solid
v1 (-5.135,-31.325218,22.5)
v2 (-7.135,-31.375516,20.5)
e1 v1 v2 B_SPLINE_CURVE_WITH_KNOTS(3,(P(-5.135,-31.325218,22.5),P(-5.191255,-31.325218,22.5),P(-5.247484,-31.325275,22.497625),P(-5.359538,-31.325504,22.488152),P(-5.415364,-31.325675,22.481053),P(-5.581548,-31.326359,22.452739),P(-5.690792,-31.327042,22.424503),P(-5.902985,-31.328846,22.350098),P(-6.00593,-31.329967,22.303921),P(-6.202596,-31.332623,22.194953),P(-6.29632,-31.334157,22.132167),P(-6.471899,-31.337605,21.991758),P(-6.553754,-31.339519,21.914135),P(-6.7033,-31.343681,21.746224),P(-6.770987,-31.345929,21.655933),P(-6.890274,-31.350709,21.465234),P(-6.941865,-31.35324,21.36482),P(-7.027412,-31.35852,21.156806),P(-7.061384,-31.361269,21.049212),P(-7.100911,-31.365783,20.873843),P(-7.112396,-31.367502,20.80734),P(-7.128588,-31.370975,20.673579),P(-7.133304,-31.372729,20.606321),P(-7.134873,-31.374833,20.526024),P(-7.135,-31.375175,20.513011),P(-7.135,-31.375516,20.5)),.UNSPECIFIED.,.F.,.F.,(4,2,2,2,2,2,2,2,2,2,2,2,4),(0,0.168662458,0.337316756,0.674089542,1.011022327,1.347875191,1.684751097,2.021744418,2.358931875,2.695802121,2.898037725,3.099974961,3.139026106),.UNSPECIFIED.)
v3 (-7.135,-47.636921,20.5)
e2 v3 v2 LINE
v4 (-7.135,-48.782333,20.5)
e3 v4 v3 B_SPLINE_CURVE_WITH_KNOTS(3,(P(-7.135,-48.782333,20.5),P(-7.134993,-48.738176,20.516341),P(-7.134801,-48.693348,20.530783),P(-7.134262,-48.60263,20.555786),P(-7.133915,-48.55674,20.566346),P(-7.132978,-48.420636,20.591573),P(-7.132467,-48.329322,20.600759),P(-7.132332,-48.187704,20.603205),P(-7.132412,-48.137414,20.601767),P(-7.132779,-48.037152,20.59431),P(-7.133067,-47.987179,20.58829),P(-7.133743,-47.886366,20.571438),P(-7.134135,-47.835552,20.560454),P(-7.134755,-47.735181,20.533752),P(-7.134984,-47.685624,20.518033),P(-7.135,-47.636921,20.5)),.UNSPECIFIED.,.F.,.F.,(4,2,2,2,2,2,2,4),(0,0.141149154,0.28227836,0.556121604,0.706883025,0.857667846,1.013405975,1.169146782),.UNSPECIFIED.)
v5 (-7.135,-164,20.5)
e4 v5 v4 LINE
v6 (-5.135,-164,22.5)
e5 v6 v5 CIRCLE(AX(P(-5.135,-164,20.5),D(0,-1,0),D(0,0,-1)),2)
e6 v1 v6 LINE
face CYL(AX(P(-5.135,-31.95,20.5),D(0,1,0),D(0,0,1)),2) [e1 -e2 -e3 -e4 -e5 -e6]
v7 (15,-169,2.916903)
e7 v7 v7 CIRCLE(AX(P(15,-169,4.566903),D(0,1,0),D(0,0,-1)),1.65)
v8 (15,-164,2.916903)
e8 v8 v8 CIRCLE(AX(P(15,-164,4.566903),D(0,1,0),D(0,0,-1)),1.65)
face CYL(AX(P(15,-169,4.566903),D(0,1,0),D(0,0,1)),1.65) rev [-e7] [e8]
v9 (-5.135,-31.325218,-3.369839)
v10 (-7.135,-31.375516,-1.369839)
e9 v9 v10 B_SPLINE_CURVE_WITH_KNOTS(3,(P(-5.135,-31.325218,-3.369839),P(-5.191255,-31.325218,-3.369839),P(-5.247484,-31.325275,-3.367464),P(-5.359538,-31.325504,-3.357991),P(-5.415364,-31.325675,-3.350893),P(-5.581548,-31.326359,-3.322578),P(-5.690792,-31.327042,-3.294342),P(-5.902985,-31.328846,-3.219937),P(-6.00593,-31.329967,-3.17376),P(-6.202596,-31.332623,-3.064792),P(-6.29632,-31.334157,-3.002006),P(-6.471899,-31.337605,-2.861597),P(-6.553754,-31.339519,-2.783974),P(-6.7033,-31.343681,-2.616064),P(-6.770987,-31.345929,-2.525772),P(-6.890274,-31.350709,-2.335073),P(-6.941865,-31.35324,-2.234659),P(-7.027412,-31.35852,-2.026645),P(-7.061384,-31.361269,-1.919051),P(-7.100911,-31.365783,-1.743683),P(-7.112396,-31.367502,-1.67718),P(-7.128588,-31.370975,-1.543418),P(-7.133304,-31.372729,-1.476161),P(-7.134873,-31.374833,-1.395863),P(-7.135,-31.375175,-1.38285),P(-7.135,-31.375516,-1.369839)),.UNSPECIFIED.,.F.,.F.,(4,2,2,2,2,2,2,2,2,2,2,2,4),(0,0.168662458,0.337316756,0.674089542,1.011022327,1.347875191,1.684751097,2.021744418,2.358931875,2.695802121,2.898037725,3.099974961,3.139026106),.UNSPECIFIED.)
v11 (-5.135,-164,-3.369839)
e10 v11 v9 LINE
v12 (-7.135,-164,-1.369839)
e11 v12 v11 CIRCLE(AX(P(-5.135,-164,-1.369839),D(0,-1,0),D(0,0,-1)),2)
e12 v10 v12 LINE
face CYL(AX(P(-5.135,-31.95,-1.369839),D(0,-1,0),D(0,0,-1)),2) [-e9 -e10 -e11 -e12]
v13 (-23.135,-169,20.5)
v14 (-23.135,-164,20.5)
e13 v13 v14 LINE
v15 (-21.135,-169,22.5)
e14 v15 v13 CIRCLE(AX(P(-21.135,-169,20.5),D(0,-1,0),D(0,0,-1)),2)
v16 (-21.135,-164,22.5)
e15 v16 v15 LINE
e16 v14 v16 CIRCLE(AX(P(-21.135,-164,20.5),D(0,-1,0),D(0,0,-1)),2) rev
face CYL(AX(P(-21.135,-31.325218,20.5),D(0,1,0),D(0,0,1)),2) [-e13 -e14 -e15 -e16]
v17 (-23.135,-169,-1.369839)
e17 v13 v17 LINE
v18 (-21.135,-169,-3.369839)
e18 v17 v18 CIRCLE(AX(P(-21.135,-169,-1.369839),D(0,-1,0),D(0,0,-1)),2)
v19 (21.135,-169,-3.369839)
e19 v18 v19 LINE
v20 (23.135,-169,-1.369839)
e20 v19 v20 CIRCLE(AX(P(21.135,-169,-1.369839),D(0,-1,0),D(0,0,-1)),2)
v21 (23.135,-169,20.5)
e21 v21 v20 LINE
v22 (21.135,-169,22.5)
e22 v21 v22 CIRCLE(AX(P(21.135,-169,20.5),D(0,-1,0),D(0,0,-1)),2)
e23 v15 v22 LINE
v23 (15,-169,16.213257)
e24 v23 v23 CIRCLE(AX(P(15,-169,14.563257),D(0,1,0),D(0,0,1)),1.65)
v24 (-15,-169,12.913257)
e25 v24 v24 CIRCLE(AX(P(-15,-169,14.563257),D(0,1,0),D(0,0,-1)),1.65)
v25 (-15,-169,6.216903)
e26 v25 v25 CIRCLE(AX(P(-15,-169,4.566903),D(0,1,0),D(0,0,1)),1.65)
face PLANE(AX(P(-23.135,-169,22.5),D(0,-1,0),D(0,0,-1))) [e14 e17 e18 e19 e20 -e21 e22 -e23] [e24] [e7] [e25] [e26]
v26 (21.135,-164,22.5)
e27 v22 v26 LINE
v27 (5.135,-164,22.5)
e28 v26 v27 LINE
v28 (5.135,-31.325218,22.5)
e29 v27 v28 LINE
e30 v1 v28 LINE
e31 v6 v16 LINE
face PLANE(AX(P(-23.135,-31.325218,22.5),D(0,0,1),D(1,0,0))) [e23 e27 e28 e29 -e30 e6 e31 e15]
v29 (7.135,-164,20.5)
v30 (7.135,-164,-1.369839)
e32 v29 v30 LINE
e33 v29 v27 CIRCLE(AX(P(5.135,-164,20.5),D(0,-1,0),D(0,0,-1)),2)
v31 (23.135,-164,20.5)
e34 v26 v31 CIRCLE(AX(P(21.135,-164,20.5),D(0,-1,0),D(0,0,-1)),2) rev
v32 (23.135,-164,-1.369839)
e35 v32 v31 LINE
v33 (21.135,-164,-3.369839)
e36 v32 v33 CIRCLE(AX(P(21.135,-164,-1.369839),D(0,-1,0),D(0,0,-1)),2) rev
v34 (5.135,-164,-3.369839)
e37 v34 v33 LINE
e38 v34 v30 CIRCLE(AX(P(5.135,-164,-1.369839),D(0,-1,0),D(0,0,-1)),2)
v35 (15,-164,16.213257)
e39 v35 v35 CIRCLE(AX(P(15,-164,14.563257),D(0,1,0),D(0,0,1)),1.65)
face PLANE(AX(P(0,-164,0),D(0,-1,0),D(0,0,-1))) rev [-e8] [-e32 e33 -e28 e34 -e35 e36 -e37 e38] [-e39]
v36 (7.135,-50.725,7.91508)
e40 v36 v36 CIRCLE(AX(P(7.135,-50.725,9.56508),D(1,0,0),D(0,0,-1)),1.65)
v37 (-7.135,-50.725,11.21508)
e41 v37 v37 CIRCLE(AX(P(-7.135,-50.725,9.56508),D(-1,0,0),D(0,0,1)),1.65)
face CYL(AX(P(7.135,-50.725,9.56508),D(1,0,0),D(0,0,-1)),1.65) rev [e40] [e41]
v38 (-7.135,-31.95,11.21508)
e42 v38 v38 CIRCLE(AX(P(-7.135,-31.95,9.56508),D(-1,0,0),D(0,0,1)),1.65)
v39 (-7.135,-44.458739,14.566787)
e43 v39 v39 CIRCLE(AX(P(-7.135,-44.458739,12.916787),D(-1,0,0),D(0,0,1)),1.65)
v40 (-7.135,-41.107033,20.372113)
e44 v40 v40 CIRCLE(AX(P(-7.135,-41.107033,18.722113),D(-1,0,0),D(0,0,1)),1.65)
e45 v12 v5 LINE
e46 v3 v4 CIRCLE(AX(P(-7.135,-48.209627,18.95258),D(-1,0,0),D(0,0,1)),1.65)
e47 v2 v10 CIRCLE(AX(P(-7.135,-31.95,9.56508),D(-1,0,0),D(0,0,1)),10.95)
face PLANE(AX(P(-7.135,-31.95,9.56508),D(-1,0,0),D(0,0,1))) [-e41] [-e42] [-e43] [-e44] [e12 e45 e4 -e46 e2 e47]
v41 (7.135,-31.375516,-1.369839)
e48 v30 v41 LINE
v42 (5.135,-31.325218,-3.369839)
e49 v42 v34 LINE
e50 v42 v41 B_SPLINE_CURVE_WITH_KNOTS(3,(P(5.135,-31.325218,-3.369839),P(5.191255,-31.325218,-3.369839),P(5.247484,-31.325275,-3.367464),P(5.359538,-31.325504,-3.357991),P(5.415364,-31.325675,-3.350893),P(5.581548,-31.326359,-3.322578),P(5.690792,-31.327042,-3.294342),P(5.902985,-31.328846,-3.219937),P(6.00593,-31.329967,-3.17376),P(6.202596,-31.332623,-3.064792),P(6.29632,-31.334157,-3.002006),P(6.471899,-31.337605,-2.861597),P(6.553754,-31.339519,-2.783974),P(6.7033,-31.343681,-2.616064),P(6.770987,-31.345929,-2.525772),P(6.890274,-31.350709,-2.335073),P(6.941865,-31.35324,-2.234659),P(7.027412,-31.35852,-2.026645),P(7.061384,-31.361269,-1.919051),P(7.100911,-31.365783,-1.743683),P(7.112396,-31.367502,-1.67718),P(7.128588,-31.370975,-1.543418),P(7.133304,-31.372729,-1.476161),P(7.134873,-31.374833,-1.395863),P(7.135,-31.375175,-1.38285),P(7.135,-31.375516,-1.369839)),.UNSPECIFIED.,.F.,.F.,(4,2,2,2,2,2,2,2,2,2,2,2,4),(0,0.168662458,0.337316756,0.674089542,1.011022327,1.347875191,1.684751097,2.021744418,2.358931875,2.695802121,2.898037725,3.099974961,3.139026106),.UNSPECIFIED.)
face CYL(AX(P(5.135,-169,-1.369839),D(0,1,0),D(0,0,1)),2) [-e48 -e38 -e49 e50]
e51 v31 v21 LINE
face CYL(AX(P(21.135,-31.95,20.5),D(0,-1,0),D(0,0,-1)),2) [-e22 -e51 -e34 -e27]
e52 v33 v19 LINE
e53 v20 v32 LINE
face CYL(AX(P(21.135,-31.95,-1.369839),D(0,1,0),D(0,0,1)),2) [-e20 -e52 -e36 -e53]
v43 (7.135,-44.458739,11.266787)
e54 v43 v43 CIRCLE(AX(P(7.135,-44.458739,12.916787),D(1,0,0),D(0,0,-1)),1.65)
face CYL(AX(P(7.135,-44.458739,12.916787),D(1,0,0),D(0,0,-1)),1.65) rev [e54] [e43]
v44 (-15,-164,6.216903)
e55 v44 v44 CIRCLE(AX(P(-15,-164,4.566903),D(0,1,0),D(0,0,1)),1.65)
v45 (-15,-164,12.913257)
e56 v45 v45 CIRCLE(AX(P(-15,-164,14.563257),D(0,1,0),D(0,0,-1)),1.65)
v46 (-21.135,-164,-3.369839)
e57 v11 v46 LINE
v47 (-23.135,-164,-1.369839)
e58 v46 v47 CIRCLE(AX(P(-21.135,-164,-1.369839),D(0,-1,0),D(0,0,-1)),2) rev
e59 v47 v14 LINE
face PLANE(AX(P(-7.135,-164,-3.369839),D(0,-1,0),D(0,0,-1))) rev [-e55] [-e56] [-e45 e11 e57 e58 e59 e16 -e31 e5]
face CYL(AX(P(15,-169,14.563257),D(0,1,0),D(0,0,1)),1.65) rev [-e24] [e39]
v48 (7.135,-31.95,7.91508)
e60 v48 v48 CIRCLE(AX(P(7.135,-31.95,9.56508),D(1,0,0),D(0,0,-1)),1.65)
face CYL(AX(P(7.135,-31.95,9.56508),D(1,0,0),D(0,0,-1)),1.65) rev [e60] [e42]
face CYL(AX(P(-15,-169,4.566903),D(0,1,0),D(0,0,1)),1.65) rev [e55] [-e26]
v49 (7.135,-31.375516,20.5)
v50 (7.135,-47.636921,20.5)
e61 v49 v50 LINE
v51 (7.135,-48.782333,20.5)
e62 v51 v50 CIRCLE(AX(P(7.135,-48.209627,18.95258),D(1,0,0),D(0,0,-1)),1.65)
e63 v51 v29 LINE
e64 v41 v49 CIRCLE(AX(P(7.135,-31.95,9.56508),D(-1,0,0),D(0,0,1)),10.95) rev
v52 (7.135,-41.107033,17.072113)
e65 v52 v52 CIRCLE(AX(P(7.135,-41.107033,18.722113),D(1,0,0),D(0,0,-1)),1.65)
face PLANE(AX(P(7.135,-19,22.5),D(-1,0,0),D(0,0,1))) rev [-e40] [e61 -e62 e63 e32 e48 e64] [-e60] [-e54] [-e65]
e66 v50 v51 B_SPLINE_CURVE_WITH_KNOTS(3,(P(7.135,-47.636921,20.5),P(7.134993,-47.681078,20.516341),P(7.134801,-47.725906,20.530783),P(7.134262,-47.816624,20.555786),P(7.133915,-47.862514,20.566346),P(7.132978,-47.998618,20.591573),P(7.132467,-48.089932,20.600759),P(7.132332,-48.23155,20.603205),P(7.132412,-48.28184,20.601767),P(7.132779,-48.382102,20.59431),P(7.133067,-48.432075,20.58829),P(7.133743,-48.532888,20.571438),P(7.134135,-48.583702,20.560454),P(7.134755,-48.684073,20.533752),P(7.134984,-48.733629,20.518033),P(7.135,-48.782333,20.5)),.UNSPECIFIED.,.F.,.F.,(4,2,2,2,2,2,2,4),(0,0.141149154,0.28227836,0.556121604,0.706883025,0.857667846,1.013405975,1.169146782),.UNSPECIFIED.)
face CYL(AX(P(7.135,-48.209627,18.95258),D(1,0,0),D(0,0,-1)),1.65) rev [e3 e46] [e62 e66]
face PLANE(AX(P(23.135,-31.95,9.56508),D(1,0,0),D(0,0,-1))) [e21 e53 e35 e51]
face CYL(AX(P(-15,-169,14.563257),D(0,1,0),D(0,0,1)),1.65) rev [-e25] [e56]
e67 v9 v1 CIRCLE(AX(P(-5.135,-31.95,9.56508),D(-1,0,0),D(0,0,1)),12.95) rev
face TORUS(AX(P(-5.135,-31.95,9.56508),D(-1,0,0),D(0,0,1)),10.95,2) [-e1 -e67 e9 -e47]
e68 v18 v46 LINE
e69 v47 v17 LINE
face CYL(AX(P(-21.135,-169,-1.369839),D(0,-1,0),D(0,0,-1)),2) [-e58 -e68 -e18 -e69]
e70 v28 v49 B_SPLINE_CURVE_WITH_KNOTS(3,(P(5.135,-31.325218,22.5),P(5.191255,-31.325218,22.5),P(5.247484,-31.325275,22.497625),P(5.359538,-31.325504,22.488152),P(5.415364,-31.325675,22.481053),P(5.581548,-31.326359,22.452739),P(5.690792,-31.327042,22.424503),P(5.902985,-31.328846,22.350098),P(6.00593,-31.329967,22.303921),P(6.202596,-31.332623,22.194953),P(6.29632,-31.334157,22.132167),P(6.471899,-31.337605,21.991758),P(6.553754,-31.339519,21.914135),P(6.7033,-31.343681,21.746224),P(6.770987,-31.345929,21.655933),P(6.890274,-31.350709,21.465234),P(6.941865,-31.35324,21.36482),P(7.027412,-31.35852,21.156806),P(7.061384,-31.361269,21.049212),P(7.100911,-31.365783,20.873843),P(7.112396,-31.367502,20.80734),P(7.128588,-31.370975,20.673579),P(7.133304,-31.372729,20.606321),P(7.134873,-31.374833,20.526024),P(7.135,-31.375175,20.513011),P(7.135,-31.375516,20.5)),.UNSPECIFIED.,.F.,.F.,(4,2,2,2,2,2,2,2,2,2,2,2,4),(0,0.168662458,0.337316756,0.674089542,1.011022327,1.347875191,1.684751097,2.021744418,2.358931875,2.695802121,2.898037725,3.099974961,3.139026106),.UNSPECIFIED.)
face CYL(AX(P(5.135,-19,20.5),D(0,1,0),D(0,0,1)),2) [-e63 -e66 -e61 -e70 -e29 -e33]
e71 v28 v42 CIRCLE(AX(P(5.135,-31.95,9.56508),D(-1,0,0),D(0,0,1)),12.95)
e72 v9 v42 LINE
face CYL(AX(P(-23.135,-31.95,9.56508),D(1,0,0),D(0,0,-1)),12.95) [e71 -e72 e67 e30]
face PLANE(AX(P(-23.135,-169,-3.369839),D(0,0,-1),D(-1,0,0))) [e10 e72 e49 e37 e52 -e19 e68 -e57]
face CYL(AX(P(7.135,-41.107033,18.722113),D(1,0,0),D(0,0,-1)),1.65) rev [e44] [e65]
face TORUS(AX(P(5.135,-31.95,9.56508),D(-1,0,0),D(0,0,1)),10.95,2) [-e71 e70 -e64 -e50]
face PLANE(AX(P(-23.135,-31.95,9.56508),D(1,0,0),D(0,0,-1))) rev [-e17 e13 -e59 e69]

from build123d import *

# Parameters (mm, degrees)
BOSS_EXTRUDE1_DEPTH            = 46.27
CUT_EXTRUDE1_START             = -16
CUT_EXTRUDE1_DEPTH             = 16
SKETCH3_W                      = 16
SKETCH3_H                      = 25.869839341
CUT_EXTRUDE2_DEPTH             = 149.547898757
F_3_3_3_3_DIAMETER_HOLE2_D     = 3.3
F_3_3_3_3_DIAMETER_HOLE2_DEPTH = 30.27
FILLET1_START                  = -31.325217542
FILLET1_OUTLINE_W              = 14.27
FILLET1_OUTLINE_H              = 25.869839341
FILLET1_DEPTH                  = 12.325217542
FILLET1_START_2                = -164
FILLET1_2_DEPTH                = 136.422667769
FILLET1_START_3                = -170
FILLET1_3_DEPTH                = 133.08200918
FILLET1_4_ANGLE                = 174.469297
SKETCH9_R                      = 1.65
CUT_EXTRUDE4_DEPTH             = 149.547898869


with BuildPart() as part:
    # Sketch1 → Boss-Extrude1 (new body)
    with BuildSketch(Plane(origin=(23.135, 0, 0), x_dir=(0, 0, -1), z_dir=(1, 0, 0))):
        with BuildLine():
            Line((3.369839341, -169), (3.369839341, -31.325217542))
            ThreePointArc((3.369839341, -31.325217542), (-9.56508033, -19), (-22.5, -31.325217542))
            Line((-22.5, -31.325217542), (-22.5, -169))
            Line((-22.5, -169), (3.369839341, -169))
        make_face()
    extrude(amount=-BOSS_EXTRUDE1_DEPTH)

    # Sketch2 → Cut-Extrude1 (cut)
    with BuildSketch(Plane.ZY.offset(23.135).offset(CUT_EXTRUDE1_START)):
        with BuildLine():
            Line((-3.369839341, -31.325217542), (-3.369839341, -164))
            Line((-3.369839341, -164), (22.5, -164))
            Line((22.5, -164), (22.5, -31.325217542))
            ThreePointArc((22.5, -31.325217542), (9.56508033, -19), (-3.369839341, -31.325217542))
        make_face()
    extrude(amount=CUT_EXTRUDE1_DEPTH, mode=Mode.SUBTRACT)

    # Sketch3 → Cut-Extrude2 (cut, through all)
    with BuildSketch(Plane.XZ.offset(164)):
        with Locations((15.135, 9.56508033)):
            Rectangle(SKETCH3_W, SKETCH3_H)
    extrude(amount=-CUT_EXTRUDE2_DEPTH, mode=Mode.SUBTRACT)

    # Ø3.3 (3.3) Diameter Hole2
    with Locations(Plane(origin=(7.135, 0, 0), x_dir=(0, 0, -1), z_dir=(1, 0, 0))):
        with Locations((-9.56508033, -31.95), (-12.916786964, -44.45873945), (-9.56508033, -50.725), (-18.95258033, -48.209626956), (-18.722113146, -41.107032816)):
            Hole(F_3_3_3_3_DIAMETER_HOLE2_D / 2, depth=F_3_3_3_3_DIAMETER_HOLE2_DEPTH)

    # Fillet1: read off the stored shape, not the designer's step
    # Fillet1 outline → Fillet1 (cut)
    with BuildSketch(Plane(origin=(0, 0, 0), x_dir=(1, 0, 0), z_dir=(0, 1, 0)).offset(FILLET1_START)):
        with Locations((0, -9.56508033)):
            Rectangle(FILLET1_OUTLINE_W, FILLET1_OUTLINE_H)
    extrude(amount=FILLET1_DEPTH, mode=Mode.SUBTRACT)

    # Fillet1 2 outline → Fillet1 2 (cut)
    with BuildSketch(Plane(origin=(0, 0, 0), x_dir=(1, 0, 0), z_dir=(0, 1, 0)).offset(FILLET1_START_2)):
        with BuildLine():
            Line((7.135, 1.369839341), (7.135, 3.369839341))
            Line((7.135, 3.369839341), (5.135, 3.369839341))
            ThreePointArc((5.135, 3.369839341), (6.549213562, 2.784052903), (7.135, 1.369839341))
        make_face()
        with BuildLine():
            Line((5.135, -22.5), (7.135, -22.5))
            Line((7.135, -22.5), (7.135, -20.5))
            ThreePointArc((7.135, -20.5), (6.549213562, -21.914213562), (5.135, -22.5))
        make_face()
        with BuildLine():
            ThreePointArc((-7.135, 1.369839341), (-6.549213562, 2.784052903), (-5.135, 3.369839341))
            Line((-5.135, 3.369839341), (-7.135, 3.369839341))
            Line((-7.135, 3.369839341), (-7.135, 1.369839341))
        make_face()
        with BuildLine():
            Line((-7.135, -22.5), (-5.135, -22.5))
            ThreePointArc((-5.135, -22.5), (-6.549213562, -21.914213562), (-7.135, -20.5))
            Line((-7.135, -20.5), (-7.135, -22.5))
        make_face()
    extrude(amount=FILLET1_2_DEPTH, mode=Mode.SUBTRACT)

    # Fillet1 3 outline → Fillet1 3 (cut)
    with BuildSketch(Plane(origin=(0, 0, 0), x_dir=(1, 0, 0), z_dir=(0, 1, 0)).offset(FILLET1_START_3)):
        with BuildLine():
            ThreePointArc((21.135, 3.369839341), (22.549213562, 2.784052903), (23.135, 1.369839341))
            Line((23.135, 1.369839341), (23.135, 3.369839341))
            Line((23.135, 3.369839341), (21.135, 3.369839341))
        make_face()
        with BuildLine():
            Line((23.135, -22.5), (23.135, -20.5))
            ThreePointArc((23.135, -20.5), (22.549213562, -21.914213562), (21.135, -22.5))
            Line((21.135, -22.5), (23.135, -22.5))
        make_face()
        with BuildLine():
            ThreePointArc((-23.135, 1.369839341), (-22.549213562, 2.784052903), (-21.135, 3.369839341))
            Line((-21.135, 3.369839341), (-23.135, 3.369839341))
            Line((-23.135, 3.369839341), (-23.135, 1.369839341))
        make_face()
        with BuildLine():
            Line((-23.135, -22.5), (-21.135, -22.5))
            ThreePointArc((-21.135, -22.5), (-22.549213562, -21.914213562), (-23.135, -20.5))
            Line((-23.135, -20.5), (-23.135, -22.5))
        make_face()
    extrude(amount=FILLET1_3_DEPTH, mode=Mode.SUBTRACT)

    # Fillet1 4 outline → Fillet1 4 (revolve)
    with BuildSketch(Plane(origin=(0, -31.95, 9.56508033), x_dir=(0, 0.04824574937689506, -0.9988354957985133), z_dir=(0, -0.9988354957985133, -0.04824574937689506))):
        with BuildLine():
            ThreePointArc((10.95, -7.135), (12.364213562, -6.549213562), (12.95, -5.135))
            Line((12.95, -5.135), (12.95, 5.135))
            ThreePointArc((12.95, 5.135), (12.364213562, 6.549213562), (10.95, 7.135))
            Line((10.95, 7.135), (1.65, 7.135))
            Line((1.65, 7.135), (1.65, -7.135))
            Line((1.65, -7.135), (10.95, -7.135))
        make_face()
    revolve(axis=Axis((0, -31.95, 9.56508033), (1, 0, 0)), revolution_arc=FILLET1_4_ANGLE)

    # Sketch9 → Cut-Extrude4 (cut, through all)
    with BuildSketch(Plane(origin=(0, -164, 0), x_dir=(1, 0, 0), z_dir=(0, 1, 0))):
        with Locations(Location((-15, -4.566903162, 0), (0, 0, 270))):
            Circle(SKETCH9_R)
        with Locations(Location((-15, -14.563257497, 0), (0, 0, 90))):
            Circle(SKETCH9_R)
        with Locations(Location((15, -14.563257497, 0), (0, 0, 270))):
            Circle(SKETCH9_R)
        with Locations(Location((15, -4.566903162, 0), (0, 0, 90))):
            Circle(SKETCH9_R)
    extrude(amount=-CUT_EXTRUDE4_DEPTH, mode=Mode.SUBTRACT)


solid = part.part
